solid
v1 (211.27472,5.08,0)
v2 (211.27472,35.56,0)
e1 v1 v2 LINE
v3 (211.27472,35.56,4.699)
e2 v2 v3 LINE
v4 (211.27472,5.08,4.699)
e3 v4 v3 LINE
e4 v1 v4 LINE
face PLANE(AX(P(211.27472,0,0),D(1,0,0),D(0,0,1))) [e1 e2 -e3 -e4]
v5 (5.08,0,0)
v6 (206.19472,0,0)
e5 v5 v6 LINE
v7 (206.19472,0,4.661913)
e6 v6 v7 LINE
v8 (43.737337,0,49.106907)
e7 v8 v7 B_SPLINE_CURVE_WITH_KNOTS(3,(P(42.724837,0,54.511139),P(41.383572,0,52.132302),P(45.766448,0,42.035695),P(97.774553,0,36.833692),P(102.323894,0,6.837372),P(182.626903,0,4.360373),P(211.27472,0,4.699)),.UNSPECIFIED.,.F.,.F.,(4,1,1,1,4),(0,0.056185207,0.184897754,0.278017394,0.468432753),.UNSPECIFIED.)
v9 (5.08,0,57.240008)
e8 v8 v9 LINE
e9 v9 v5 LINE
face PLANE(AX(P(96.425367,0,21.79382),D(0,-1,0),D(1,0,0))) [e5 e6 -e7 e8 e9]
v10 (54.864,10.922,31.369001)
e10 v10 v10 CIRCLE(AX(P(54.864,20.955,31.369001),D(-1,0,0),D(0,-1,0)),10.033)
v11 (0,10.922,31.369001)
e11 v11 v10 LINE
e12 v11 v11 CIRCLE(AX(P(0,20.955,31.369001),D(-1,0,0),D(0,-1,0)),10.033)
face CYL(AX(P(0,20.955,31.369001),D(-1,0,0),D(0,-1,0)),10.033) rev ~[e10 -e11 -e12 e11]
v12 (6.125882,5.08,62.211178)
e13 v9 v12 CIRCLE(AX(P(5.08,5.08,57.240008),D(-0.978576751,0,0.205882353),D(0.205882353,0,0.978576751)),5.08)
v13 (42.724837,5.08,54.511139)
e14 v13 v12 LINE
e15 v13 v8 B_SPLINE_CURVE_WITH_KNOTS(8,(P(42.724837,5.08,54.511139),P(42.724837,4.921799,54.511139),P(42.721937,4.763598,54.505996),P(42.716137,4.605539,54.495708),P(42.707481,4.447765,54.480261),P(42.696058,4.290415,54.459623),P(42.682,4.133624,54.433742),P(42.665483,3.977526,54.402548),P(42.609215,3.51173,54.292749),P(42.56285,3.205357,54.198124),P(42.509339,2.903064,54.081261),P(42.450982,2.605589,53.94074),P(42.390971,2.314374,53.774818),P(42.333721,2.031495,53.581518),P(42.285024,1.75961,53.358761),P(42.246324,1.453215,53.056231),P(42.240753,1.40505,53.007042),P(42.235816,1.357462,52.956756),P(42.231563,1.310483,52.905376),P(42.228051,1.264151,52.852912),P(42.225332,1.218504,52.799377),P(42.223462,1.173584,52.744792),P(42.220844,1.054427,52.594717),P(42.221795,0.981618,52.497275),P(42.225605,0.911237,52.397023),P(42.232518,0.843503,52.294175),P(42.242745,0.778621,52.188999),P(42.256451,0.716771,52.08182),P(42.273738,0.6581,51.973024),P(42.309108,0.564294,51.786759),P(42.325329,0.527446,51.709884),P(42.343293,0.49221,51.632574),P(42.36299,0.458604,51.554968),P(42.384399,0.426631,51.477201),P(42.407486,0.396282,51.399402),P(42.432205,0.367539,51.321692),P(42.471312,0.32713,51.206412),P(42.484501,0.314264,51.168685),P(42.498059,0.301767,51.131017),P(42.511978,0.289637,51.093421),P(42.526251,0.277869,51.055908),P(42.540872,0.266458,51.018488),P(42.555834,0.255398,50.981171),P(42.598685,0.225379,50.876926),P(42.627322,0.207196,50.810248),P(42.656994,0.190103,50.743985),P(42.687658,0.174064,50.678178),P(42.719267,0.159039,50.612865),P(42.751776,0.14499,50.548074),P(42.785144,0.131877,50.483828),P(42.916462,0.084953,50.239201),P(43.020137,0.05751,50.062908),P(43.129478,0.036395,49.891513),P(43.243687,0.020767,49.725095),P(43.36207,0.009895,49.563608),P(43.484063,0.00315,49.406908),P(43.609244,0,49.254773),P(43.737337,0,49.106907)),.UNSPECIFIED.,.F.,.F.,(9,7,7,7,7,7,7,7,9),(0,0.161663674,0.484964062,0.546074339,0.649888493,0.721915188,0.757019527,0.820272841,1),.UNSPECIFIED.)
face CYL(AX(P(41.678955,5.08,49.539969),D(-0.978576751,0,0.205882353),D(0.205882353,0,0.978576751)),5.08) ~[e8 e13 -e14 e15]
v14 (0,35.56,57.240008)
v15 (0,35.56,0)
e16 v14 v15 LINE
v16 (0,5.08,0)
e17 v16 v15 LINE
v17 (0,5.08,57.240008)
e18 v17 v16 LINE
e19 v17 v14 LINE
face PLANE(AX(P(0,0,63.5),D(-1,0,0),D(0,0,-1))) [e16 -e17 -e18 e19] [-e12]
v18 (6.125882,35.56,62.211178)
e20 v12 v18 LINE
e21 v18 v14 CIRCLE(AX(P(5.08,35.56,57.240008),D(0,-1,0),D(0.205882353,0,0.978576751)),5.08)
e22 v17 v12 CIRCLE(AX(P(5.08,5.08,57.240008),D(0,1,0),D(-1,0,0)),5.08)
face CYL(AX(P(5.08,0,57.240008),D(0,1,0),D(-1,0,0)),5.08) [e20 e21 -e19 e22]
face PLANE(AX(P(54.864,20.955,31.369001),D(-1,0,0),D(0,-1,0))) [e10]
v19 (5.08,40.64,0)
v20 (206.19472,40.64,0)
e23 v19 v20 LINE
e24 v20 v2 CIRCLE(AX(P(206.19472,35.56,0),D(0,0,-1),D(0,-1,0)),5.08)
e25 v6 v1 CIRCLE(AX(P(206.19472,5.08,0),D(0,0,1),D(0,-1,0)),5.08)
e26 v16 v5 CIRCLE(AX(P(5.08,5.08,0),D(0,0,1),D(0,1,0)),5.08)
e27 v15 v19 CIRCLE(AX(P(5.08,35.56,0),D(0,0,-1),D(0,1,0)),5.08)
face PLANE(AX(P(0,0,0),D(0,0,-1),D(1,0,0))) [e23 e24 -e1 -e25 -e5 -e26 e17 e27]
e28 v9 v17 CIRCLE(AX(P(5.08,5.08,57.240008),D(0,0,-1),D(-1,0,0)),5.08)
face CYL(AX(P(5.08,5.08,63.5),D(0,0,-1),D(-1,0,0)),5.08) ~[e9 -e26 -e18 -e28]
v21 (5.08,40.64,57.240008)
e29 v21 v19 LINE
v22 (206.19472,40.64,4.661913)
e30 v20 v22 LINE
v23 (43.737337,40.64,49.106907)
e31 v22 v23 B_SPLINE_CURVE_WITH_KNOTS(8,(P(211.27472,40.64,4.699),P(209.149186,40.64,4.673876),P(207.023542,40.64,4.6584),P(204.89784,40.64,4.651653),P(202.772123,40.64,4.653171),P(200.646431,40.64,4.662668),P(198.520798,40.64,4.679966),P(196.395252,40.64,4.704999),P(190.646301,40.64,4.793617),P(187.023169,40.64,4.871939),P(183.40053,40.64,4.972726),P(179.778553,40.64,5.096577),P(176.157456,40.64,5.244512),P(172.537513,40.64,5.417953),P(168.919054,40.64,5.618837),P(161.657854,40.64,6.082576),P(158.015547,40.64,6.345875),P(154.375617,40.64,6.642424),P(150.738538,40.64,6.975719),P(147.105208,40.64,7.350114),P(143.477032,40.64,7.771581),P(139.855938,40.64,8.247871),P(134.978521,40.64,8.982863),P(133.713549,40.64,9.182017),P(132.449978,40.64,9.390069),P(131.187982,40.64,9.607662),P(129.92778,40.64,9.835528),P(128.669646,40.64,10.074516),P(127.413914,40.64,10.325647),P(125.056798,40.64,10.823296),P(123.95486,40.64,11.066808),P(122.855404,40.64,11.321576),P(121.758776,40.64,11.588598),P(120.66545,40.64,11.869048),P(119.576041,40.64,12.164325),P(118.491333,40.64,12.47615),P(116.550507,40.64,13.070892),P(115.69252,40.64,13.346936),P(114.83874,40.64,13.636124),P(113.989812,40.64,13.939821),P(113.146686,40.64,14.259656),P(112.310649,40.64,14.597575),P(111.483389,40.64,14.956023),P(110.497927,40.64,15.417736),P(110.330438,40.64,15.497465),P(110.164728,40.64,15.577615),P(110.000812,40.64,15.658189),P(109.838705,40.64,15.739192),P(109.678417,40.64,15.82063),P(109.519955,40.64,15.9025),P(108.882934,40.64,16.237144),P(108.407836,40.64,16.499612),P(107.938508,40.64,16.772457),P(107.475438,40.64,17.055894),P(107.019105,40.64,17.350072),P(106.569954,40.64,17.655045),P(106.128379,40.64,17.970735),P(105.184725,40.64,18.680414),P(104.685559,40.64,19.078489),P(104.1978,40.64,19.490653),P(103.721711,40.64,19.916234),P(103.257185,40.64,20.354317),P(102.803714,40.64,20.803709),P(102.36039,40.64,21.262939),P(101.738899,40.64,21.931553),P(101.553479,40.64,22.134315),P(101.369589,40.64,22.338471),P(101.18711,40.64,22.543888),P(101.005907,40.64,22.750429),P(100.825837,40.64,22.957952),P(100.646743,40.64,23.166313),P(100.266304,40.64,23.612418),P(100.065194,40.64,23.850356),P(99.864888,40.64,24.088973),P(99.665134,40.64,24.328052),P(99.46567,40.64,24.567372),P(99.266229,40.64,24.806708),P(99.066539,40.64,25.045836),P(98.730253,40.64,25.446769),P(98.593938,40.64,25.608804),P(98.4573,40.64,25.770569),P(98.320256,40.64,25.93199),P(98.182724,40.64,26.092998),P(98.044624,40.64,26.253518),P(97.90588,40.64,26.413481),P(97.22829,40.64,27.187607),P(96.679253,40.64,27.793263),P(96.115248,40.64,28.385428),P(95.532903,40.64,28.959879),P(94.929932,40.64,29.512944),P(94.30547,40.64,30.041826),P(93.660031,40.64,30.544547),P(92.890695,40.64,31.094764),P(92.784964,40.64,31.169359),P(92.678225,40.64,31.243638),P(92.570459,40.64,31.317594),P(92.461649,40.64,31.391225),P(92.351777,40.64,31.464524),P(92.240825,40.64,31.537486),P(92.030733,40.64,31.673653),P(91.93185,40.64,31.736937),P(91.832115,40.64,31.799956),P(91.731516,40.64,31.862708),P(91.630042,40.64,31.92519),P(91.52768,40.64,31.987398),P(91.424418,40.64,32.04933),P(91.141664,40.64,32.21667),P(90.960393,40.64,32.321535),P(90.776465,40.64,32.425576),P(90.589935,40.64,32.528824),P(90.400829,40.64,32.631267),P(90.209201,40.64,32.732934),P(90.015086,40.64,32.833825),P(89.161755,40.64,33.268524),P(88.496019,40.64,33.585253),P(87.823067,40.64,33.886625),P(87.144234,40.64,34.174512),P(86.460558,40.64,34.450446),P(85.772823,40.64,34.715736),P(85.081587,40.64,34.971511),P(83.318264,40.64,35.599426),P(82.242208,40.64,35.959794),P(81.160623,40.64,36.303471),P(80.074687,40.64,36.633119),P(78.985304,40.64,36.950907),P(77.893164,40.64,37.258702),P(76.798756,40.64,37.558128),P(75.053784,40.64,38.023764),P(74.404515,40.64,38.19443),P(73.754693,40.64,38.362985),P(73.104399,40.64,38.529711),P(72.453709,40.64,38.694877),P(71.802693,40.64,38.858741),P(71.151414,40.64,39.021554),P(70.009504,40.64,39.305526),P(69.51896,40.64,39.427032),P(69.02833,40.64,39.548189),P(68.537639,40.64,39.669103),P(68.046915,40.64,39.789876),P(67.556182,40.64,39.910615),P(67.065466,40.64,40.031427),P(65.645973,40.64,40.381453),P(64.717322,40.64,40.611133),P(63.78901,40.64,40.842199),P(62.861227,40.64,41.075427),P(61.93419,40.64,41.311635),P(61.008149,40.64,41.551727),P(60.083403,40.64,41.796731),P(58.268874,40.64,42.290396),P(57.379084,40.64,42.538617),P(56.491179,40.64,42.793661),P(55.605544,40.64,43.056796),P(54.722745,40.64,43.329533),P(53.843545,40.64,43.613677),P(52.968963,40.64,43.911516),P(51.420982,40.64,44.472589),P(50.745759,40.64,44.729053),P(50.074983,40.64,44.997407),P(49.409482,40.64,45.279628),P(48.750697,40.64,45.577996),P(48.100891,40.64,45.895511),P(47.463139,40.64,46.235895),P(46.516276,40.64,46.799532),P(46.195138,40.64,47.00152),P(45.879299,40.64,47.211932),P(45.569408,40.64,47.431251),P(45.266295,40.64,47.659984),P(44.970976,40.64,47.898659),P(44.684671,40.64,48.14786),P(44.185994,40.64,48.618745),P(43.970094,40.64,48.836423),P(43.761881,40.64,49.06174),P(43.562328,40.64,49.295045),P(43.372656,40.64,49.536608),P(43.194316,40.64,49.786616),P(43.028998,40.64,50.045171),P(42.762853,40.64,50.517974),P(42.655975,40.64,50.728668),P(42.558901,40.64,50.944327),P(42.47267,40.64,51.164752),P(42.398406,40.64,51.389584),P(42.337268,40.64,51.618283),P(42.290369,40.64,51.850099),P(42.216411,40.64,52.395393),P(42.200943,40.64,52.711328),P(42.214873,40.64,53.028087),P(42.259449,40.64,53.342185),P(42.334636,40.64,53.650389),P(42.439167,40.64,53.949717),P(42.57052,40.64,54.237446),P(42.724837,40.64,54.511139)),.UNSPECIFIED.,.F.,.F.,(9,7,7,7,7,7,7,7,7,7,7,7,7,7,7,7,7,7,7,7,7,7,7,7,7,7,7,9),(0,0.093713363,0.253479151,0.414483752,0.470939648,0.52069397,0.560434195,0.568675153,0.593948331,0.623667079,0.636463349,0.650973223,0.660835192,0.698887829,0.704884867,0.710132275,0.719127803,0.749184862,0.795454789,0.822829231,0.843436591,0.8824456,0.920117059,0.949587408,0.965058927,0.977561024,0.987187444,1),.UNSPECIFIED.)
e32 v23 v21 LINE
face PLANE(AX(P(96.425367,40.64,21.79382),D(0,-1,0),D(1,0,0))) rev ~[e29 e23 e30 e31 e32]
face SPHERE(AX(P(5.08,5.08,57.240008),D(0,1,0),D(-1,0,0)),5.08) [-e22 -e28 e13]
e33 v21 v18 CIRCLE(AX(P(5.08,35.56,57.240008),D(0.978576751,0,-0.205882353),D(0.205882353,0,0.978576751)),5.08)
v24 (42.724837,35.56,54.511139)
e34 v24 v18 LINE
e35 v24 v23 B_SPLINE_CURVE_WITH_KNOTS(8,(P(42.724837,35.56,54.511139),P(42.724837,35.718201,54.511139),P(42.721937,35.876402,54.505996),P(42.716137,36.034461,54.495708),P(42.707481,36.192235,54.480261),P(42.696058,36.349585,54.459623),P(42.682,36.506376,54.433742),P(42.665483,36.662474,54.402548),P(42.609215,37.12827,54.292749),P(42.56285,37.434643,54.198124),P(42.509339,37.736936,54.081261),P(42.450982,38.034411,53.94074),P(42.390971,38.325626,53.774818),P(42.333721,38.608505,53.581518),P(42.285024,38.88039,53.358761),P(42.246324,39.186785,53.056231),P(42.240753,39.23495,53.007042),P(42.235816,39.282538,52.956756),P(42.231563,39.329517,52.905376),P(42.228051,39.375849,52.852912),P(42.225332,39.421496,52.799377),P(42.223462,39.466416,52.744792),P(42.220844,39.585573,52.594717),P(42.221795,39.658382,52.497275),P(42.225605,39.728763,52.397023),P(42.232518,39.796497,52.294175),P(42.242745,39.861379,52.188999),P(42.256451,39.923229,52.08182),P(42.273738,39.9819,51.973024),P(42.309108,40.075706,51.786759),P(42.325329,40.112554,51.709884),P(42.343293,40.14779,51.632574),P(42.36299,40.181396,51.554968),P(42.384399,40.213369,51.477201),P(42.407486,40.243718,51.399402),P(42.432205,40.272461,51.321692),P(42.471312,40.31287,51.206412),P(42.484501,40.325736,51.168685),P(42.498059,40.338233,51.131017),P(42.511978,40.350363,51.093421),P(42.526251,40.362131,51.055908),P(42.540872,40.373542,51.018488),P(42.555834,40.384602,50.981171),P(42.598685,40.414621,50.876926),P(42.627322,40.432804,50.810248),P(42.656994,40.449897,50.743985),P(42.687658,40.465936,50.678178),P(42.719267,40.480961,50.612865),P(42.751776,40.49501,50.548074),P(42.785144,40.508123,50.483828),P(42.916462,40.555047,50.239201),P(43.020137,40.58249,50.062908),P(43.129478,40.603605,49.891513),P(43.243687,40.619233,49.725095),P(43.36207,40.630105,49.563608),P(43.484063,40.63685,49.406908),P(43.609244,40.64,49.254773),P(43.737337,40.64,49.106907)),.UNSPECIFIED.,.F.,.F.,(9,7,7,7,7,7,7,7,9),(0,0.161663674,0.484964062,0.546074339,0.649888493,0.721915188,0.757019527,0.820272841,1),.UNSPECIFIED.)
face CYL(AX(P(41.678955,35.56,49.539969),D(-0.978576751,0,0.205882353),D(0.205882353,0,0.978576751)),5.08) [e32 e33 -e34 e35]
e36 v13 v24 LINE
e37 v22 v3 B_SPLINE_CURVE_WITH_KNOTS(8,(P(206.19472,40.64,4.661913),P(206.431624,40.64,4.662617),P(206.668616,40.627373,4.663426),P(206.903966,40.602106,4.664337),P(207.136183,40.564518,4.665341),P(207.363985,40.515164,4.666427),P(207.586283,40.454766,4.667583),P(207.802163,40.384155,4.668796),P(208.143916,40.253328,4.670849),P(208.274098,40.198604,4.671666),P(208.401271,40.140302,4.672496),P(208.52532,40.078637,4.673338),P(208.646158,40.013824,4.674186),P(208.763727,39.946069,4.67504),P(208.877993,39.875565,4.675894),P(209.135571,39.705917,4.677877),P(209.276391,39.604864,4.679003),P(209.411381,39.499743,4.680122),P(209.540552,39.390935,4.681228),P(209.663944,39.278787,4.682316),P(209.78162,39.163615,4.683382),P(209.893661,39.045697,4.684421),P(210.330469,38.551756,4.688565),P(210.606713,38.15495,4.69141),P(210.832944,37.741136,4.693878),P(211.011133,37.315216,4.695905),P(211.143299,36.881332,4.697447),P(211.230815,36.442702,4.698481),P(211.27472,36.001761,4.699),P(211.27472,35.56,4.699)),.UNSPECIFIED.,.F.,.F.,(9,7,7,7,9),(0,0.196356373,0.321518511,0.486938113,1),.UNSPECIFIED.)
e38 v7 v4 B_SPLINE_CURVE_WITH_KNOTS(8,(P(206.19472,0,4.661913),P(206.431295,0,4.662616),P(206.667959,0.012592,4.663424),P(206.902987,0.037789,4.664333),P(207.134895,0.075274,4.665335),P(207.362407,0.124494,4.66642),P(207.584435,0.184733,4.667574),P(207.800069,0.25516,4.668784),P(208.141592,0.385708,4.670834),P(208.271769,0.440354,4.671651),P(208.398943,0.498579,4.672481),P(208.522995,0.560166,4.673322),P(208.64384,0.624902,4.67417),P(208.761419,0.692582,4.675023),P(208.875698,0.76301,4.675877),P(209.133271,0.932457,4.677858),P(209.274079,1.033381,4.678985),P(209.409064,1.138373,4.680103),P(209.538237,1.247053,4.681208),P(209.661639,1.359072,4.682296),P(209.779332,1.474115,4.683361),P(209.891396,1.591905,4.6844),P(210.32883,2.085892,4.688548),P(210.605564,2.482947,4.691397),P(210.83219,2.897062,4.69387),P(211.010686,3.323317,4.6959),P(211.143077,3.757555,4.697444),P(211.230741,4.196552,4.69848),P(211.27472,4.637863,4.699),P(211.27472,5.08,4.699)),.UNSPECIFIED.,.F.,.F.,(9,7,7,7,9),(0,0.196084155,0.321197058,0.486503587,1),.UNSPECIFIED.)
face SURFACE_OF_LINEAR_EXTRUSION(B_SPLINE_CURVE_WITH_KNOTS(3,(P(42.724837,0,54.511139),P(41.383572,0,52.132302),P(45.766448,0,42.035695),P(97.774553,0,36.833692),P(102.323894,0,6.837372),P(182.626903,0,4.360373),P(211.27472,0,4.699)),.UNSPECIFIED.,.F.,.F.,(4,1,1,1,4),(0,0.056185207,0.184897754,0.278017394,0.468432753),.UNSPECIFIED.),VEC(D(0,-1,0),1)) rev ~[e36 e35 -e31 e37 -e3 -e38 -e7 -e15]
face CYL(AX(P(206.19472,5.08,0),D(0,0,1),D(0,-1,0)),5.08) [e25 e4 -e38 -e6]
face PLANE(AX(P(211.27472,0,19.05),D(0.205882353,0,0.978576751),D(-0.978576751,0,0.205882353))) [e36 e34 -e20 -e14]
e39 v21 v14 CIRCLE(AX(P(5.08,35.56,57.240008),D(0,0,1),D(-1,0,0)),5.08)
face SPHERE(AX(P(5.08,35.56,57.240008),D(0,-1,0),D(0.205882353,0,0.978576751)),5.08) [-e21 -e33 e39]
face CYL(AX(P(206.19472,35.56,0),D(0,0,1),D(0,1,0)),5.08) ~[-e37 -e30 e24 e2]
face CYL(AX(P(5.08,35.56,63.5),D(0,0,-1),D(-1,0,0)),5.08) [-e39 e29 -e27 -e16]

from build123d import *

# Parameters (mm, degrees)
F1_DEPTH = 40.64
F2_R     = 10.033
F3_DEPTH = 54.864
F5_DEPTH = 50.8
F10_R    = 5.08


# Not quite as in the source:
# - a feature of the source that left no trace in its solid (it failed there, or was rolled back) is left out


with BuildPart() as f1:
    # F0 (on Front) → F1 (new body)
    with BuildSketch(Plane.XZ):
        Polygon((0, 63.5), (0, 0), (211.2747204471, 0), (211.2747204471, 19.05), align=None)
    extrude(amount=-F1_DEPTH)

    # F2 (on face) → F3 (cut)
    with BuildSketch(Plane(origin=(0, 0, 0), x_dir=(0, -1, 0), z_dir=(-1, 0, 0))):
        with Locations((-20.9550000727, 31.3690006733)):
            Circle(F2_R)
    extrude(amount=-F3_DEPTH, mode=Mode.SUBTRACT)

    # F4 (on face) → F5 (cut)
    with BuildSketch(Plane.XZ):
        with BuildLine():
            Line((211.2747204471, 19.05), (42.7248373454, 54.5111393546))
            add(Edge.make_bspline(
                [(42.7248373454, 54.5111393546), (41.3835720379, 52.132302018), (45.7664482788, 42.0356948399), (97.7745530391, 36.833691871), (102.323893955, 6.8373724435), (182.6269030241, 4.3603729739), (211.2747204471, 4.6990001574)],
                knots=[0, 0, 0, 0, 0.0561852073, 0.1848977539, 0.2780173943, 0.468432753, 0.468432753, 0.468432753, 0.468432753], degree=3))
            Line((211.2747204471, 4.6990001574), (211.2747204471, 19.05))
        make_face()
    extrude(amount=-F5_DEPTH, mode=Mode.SUBTRACT)

    # F10
    f10_edges = [f1.edges().sort_by_distance(p)[0] for p in [
        (0, 0, 31.75),
        (21.362419, 0, 59.00557),
        (0, 20.32, 63.5),
        (21.362419, 40.64, 59.00557),
        (211.27472, 0, 2.3495),
        (0, 40.64, 31.75),
        (211.27472, 40.64, 2.3495),
    ]]
    fillet(f10_edges, radius=F10_R)


solid = f1.part
